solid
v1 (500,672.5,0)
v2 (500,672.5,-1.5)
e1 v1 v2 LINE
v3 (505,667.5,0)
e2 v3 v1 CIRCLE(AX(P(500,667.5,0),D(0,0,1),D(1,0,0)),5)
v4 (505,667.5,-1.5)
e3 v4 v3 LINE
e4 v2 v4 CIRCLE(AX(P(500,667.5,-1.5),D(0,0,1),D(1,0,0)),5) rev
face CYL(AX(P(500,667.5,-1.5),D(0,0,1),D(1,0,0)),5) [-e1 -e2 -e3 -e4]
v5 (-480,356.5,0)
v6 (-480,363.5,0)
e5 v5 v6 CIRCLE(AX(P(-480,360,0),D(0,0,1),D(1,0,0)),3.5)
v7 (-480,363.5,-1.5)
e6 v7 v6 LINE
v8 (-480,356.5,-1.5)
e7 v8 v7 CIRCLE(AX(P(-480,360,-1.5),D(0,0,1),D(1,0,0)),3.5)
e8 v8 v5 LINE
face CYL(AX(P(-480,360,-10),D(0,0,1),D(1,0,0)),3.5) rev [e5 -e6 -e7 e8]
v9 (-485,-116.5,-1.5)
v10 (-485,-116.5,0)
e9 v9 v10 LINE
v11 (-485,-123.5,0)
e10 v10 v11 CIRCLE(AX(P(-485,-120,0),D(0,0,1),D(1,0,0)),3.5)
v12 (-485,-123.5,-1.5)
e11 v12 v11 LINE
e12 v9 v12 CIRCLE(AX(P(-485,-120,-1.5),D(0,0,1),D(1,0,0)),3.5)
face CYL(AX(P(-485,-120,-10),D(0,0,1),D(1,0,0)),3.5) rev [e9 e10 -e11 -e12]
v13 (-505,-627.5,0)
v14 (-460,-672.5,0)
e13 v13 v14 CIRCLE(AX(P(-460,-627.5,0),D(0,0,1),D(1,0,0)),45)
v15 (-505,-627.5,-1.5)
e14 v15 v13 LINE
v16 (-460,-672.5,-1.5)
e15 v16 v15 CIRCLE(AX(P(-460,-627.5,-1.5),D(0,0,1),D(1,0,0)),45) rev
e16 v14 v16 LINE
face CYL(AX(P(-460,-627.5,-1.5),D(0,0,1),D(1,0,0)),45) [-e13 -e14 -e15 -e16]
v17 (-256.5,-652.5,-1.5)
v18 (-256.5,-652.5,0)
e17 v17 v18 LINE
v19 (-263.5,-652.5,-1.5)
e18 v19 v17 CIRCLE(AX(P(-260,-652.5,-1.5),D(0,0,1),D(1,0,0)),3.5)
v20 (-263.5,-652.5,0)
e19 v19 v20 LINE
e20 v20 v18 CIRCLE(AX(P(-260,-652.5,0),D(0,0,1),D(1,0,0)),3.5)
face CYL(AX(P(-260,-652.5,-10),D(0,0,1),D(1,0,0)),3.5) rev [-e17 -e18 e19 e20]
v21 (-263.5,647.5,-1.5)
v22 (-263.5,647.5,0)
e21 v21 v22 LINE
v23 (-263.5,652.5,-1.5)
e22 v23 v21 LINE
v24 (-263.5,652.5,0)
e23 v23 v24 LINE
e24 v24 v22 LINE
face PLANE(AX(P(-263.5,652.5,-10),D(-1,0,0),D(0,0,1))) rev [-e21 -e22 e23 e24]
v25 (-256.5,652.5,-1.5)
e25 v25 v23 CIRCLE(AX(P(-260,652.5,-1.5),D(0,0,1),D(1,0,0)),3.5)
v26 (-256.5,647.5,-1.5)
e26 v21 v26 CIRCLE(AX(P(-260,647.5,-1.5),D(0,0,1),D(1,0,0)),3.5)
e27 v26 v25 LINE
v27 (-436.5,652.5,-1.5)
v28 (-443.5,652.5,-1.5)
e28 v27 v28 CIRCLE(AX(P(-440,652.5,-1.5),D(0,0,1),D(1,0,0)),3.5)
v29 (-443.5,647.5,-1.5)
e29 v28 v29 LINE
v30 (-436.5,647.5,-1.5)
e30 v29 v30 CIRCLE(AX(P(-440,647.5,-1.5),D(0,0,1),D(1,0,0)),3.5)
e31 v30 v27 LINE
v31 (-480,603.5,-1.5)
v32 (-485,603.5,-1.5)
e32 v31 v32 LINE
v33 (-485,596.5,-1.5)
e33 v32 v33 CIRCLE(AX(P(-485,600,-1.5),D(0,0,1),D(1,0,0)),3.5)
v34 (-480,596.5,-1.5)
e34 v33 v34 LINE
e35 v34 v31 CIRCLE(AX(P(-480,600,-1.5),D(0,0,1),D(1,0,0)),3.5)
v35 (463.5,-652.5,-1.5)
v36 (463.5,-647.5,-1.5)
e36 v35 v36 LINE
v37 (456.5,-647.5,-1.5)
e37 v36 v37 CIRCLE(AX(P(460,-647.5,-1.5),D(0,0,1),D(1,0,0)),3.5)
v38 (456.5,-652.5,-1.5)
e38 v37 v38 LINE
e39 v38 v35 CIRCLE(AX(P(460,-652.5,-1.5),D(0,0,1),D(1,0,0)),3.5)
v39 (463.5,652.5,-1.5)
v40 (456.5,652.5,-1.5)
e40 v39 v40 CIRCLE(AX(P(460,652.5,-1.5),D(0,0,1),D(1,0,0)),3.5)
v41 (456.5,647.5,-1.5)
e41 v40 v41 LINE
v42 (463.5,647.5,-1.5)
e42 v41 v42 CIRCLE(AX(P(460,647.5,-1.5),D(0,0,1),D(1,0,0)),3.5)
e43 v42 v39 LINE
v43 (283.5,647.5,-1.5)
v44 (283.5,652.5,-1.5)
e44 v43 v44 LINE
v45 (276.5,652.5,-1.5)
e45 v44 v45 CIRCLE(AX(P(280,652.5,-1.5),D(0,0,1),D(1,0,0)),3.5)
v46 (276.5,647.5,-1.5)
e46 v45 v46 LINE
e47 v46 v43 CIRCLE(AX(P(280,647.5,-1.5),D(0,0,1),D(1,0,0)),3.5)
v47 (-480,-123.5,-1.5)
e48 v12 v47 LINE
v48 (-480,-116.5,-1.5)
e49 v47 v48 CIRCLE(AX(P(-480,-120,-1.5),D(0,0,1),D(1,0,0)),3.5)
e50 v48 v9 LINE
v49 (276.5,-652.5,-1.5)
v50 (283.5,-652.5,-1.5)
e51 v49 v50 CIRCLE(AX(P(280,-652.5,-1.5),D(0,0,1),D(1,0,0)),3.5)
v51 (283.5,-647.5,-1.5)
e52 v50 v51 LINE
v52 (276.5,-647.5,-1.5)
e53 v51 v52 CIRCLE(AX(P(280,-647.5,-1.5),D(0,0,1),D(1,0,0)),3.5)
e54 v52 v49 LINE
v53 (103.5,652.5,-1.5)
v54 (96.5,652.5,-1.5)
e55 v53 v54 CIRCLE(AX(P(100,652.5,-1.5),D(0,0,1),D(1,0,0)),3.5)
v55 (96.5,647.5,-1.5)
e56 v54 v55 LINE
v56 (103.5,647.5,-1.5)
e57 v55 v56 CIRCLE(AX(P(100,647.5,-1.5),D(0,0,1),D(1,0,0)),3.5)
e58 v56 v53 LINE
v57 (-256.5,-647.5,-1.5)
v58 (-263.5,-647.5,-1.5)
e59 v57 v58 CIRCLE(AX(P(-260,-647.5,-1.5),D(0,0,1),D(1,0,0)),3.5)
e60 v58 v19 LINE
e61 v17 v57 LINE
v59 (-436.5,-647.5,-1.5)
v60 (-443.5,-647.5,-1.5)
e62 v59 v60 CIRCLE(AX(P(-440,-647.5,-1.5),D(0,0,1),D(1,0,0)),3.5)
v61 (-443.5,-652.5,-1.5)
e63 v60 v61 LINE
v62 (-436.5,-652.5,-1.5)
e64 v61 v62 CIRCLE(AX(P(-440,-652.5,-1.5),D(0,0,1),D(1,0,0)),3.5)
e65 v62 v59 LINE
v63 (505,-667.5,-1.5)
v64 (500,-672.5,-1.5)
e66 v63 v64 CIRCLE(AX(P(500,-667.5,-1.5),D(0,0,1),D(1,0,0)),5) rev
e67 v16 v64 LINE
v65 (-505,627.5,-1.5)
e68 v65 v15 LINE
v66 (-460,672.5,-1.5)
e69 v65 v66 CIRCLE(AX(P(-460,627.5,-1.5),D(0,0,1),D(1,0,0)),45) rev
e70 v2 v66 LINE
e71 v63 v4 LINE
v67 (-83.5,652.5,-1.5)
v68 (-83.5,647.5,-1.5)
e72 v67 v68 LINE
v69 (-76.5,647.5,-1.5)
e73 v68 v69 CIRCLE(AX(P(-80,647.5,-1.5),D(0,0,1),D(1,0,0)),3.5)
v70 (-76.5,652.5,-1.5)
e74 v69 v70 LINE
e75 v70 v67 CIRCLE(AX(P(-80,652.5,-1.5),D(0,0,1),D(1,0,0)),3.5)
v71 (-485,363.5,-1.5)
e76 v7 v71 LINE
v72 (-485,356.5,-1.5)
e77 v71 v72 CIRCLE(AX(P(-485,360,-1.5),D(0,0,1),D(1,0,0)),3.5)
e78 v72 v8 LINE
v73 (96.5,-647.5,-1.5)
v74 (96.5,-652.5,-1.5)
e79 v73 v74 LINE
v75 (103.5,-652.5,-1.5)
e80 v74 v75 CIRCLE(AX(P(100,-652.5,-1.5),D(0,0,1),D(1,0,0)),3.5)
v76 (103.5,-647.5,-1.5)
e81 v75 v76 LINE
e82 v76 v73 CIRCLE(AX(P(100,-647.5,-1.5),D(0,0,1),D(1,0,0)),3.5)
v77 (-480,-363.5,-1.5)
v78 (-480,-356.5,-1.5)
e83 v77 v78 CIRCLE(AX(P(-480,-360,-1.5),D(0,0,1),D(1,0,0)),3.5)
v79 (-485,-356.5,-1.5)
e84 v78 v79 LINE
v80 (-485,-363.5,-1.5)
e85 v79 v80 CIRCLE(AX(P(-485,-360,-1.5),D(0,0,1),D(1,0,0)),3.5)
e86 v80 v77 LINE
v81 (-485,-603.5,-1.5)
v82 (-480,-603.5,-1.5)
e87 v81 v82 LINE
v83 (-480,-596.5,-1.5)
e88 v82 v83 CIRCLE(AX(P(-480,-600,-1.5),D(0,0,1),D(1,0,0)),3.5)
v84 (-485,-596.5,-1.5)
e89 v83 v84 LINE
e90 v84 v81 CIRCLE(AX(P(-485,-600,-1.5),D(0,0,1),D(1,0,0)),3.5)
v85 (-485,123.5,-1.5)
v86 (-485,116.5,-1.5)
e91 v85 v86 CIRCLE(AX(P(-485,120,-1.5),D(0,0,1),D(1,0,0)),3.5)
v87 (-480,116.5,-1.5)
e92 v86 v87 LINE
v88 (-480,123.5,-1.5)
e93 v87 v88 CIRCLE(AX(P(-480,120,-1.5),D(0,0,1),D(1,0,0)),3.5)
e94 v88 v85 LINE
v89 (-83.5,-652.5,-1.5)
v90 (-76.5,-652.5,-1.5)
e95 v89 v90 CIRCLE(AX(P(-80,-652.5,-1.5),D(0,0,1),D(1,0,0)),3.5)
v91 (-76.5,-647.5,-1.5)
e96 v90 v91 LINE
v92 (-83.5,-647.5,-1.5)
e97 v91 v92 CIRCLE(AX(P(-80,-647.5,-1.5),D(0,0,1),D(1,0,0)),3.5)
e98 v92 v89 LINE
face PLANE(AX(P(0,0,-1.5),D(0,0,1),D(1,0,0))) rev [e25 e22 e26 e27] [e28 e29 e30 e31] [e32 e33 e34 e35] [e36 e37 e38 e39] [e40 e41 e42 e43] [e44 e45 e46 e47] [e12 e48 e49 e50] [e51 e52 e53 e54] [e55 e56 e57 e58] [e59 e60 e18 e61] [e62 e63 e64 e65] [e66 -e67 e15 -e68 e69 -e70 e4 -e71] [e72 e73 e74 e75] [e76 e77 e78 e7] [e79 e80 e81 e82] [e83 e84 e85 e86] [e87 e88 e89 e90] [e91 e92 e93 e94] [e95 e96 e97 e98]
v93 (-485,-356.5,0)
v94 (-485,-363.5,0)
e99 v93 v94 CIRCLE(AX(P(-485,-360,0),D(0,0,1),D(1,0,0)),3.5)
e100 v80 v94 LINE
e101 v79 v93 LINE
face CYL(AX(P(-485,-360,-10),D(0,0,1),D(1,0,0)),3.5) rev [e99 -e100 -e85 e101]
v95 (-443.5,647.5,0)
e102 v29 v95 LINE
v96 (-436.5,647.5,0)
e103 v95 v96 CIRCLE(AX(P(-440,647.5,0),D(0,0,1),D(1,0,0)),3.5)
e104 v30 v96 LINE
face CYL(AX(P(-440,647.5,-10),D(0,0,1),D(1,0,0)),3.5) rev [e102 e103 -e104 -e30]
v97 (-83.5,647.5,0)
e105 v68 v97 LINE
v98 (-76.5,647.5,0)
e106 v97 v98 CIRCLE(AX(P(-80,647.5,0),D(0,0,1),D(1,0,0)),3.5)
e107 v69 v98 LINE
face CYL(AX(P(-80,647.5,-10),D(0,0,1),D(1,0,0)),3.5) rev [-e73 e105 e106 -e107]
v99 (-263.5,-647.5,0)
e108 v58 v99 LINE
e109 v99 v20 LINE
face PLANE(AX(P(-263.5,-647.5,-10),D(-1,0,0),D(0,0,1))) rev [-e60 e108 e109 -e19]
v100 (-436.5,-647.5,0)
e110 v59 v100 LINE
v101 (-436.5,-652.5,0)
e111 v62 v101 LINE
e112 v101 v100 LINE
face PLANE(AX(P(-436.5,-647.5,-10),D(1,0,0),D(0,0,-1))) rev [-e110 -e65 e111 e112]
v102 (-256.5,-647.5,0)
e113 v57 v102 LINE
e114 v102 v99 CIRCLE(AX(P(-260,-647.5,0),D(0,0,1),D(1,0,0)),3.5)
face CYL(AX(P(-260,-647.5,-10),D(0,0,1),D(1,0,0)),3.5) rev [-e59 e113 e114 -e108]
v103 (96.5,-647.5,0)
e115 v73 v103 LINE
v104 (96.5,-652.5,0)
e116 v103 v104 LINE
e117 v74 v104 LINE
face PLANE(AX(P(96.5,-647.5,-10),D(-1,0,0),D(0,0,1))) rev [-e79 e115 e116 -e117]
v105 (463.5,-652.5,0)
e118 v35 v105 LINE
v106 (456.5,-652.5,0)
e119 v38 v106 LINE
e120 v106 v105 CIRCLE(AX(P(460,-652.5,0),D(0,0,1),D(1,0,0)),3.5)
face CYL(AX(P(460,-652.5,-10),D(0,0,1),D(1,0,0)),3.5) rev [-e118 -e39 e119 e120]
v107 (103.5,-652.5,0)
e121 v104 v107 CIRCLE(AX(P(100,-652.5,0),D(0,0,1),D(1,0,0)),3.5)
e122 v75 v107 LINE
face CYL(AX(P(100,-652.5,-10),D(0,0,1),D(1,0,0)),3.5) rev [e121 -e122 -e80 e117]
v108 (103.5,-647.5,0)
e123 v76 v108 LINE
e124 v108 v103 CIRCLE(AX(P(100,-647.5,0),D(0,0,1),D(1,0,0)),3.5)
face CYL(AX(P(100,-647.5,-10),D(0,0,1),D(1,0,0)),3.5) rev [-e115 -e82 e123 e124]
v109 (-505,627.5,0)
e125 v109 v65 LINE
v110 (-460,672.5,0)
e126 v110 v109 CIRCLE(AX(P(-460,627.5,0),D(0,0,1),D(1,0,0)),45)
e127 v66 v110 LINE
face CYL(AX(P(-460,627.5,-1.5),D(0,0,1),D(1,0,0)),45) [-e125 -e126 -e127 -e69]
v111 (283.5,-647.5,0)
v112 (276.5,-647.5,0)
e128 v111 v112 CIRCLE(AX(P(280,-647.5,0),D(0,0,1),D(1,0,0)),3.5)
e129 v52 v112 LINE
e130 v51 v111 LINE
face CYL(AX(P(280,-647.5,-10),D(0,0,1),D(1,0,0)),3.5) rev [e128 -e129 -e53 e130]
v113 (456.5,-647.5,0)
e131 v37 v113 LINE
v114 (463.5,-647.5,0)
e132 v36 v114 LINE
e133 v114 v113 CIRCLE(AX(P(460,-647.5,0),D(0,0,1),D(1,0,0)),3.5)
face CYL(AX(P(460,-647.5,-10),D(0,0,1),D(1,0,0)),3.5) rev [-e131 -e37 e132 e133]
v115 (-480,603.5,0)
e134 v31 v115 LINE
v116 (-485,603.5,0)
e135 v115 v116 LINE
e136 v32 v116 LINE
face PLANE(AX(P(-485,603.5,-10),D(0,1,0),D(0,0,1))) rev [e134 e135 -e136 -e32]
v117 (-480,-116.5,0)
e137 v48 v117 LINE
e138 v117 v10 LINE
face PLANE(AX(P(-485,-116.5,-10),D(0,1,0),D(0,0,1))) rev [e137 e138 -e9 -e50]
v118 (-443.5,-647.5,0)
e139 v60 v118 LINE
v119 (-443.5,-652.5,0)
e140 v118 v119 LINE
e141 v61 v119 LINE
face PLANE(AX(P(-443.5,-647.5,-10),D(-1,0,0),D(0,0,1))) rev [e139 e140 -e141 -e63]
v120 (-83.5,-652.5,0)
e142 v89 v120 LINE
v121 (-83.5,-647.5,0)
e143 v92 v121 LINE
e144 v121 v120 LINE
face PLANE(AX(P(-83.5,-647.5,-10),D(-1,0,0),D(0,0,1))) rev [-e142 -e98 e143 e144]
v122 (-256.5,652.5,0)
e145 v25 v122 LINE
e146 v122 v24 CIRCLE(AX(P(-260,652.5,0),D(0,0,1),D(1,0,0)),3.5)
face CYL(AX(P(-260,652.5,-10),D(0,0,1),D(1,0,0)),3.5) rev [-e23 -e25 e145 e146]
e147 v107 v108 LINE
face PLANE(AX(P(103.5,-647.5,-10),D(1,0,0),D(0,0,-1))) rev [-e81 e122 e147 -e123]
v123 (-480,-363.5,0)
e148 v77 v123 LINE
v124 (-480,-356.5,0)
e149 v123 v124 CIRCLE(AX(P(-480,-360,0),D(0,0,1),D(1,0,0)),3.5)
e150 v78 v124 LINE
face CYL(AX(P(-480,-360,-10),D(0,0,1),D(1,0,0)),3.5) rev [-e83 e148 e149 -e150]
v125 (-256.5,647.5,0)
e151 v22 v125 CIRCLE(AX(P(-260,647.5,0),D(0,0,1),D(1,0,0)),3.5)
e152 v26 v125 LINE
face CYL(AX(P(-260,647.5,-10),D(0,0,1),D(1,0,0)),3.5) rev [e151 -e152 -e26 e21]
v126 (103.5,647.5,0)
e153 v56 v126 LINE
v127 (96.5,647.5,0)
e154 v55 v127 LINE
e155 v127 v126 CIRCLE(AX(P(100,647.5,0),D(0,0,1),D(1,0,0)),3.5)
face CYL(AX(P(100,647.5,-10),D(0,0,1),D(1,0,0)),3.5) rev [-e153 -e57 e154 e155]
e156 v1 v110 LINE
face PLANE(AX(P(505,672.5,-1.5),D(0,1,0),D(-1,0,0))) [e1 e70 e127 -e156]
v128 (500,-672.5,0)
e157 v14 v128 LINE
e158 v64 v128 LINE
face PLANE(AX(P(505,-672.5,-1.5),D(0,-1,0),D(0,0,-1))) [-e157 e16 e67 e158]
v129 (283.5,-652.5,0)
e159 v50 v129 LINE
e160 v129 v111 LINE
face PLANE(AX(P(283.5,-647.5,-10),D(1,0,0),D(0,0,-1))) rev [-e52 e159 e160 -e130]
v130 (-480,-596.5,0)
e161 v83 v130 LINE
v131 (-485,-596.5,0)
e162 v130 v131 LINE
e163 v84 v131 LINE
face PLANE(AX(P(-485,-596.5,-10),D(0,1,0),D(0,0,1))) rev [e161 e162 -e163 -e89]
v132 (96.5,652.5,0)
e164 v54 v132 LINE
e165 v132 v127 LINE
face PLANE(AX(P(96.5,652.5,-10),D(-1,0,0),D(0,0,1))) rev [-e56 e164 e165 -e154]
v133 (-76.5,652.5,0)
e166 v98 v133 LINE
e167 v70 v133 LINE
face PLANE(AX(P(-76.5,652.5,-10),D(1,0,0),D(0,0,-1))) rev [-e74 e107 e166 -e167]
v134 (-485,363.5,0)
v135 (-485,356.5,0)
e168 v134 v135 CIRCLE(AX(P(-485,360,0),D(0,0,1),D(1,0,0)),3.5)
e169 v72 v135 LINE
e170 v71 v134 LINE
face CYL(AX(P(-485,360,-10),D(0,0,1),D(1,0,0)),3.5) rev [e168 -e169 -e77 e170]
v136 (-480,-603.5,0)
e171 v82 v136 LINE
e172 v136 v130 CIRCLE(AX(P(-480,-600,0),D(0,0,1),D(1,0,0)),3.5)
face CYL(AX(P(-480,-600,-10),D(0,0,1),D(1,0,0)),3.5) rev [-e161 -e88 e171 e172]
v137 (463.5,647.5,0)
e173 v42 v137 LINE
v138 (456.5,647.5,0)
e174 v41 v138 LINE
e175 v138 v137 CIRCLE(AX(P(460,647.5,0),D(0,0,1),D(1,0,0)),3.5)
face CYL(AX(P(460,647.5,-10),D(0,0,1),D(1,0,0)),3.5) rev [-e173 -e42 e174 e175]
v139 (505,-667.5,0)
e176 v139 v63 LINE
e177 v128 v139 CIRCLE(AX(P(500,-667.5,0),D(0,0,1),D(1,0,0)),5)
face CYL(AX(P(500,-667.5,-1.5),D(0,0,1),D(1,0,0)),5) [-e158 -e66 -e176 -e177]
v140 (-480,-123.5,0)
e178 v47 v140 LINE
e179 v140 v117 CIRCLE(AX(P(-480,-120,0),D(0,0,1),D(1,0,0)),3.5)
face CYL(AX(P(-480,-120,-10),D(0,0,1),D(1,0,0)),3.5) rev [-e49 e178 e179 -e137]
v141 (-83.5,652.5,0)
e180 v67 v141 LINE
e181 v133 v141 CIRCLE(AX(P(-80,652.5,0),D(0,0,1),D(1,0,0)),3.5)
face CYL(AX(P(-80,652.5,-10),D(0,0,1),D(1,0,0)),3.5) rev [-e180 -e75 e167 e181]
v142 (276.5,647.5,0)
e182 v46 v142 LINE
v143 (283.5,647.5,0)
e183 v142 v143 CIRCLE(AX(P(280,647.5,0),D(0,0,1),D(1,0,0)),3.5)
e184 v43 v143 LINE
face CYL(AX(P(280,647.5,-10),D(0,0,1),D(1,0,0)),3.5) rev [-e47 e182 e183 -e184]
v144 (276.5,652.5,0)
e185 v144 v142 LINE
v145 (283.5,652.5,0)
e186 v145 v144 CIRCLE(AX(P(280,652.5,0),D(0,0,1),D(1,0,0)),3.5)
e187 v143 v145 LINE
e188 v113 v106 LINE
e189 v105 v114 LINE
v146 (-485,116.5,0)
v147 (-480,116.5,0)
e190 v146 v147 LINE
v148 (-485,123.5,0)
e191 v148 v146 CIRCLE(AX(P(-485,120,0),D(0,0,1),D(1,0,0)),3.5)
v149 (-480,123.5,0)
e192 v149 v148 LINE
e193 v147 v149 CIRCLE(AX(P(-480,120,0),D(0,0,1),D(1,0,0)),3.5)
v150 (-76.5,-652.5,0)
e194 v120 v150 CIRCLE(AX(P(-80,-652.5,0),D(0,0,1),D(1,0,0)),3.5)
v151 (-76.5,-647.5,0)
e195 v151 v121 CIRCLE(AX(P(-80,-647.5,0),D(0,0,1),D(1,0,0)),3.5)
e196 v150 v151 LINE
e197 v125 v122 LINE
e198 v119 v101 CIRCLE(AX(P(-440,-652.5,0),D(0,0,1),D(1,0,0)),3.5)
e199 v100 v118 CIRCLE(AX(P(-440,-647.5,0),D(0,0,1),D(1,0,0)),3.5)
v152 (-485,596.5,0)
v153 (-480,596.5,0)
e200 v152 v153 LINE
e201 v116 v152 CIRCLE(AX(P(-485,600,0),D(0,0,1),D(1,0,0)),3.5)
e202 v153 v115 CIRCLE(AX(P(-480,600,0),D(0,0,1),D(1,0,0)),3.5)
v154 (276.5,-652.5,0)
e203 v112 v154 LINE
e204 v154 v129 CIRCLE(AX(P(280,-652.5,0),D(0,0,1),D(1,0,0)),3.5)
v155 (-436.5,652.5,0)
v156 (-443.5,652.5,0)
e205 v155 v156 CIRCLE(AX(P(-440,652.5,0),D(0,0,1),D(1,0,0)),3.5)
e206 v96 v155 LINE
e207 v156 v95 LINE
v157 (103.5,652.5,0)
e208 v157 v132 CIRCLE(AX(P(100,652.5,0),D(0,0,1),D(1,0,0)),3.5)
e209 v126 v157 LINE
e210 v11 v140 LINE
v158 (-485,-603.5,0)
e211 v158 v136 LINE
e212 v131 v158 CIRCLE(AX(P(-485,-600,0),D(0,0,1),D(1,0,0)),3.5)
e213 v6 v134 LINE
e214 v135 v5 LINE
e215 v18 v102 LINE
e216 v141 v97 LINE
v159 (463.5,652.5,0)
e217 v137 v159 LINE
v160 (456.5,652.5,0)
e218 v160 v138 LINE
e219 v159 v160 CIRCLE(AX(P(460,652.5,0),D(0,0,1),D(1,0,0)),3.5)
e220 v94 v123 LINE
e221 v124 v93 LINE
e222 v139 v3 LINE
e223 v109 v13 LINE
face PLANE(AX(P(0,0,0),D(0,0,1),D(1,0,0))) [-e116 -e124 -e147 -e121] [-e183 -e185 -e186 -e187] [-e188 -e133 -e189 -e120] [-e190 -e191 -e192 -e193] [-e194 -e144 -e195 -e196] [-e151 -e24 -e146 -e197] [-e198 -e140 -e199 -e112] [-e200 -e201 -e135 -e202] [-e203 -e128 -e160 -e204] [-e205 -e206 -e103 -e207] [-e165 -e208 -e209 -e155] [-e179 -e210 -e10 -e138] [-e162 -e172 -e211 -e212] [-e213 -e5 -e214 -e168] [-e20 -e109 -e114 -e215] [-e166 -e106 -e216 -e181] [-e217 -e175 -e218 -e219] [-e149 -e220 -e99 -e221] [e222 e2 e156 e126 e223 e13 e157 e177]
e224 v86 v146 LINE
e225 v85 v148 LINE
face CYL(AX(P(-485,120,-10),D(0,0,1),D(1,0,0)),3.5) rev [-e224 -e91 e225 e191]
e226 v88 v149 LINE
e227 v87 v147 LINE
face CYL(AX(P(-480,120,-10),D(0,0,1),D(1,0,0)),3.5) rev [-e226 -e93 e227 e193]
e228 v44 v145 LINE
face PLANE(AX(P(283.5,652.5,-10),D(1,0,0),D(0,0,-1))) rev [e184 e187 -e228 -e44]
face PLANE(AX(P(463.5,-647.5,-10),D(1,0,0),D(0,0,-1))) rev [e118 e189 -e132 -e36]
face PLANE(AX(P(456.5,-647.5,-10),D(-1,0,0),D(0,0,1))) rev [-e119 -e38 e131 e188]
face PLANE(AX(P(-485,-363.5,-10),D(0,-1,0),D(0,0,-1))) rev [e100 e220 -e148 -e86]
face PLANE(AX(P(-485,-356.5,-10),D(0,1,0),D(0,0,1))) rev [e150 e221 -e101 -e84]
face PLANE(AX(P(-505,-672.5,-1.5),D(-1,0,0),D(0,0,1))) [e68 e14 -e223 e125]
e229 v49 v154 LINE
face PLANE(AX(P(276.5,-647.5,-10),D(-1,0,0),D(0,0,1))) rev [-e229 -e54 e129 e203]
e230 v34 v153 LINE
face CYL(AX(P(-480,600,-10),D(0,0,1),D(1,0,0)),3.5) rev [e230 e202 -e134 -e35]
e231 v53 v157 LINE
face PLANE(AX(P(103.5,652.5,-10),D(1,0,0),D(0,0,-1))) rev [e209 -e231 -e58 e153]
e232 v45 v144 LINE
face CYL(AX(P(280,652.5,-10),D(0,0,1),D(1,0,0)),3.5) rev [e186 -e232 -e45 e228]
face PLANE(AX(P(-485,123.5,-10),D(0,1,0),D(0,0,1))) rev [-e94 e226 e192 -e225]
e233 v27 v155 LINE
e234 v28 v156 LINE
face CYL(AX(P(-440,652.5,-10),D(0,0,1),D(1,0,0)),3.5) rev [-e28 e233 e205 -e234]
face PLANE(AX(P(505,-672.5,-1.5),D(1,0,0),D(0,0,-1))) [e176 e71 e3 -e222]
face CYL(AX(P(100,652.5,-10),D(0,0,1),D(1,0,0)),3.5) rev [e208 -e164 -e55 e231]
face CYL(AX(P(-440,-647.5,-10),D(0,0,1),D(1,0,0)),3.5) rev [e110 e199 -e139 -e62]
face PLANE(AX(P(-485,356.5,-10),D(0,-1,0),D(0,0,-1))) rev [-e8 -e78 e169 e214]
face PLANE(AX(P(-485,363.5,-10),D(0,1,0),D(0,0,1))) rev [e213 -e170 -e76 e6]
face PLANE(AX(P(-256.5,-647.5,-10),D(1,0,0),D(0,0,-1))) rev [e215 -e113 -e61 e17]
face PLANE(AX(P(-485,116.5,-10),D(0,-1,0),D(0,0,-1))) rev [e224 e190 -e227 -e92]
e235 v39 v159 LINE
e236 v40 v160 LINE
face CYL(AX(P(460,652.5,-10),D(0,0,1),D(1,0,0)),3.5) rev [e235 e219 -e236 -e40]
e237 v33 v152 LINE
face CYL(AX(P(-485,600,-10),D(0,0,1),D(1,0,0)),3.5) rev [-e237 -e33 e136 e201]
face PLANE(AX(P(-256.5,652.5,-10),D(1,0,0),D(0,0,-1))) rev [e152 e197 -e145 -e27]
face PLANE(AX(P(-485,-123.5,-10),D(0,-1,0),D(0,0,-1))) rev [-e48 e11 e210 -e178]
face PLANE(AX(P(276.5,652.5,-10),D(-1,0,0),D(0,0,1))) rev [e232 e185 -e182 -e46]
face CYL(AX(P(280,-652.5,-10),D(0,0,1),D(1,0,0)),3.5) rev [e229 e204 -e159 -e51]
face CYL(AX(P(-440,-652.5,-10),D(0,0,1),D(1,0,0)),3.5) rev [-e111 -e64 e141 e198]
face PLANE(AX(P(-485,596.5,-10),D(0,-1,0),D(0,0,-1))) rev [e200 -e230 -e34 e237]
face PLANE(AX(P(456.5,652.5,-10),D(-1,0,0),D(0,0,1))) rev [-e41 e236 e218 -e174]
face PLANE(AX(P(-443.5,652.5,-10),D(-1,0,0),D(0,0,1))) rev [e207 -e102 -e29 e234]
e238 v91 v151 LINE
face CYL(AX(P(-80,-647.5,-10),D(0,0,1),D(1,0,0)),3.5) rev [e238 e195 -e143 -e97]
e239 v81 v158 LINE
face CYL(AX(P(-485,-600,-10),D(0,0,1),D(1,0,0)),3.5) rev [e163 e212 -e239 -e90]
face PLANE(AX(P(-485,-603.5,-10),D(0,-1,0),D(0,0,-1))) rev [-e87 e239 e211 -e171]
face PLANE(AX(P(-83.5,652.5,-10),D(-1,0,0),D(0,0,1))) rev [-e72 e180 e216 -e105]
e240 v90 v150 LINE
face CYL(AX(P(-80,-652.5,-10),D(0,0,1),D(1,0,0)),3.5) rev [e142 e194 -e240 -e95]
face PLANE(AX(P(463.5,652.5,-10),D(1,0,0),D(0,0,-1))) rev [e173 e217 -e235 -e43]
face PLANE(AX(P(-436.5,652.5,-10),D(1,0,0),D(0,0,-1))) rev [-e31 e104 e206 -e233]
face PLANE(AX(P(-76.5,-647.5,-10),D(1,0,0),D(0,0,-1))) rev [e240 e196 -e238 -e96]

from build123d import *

# Parameters (mm, degrees)
SKETCH_1_W             = 1010
SKETCH_1_H             = 1345
SM_BASE_FLANGE_1_DEPTH = 1.5
FILLET_1_R             = 45
FILLET_2_R             = 5
CUT_EXTRUDE_1_DEPTH    = 10
PATTERN_LINEAR_1_COUNT = 6
PATTERN_LINEAR_1_PITCH = 240
CUT_EXTRUDE_2_DEPTH    = 10
PATTERN_LINEAR_2_COUNT = 6
PATTERN_LINEAR_2_PITCH = 180


# Sheet-metal steps are written as plain solids
with BuildPart() as part:
    # Sketch 1 → 基体-法兰1 (new body)
    with BuildSketch(Plane.XY):
        Rectangle(SKETCH_1_W, SKETCH_1_H)
    extrude(amount=-SM_BASE_FLANGE_1_DEPTH)

    # 圆角1
    fillet_1_edges = [part.edges().sort_by_distance(p)[0] for p in [
        (-505, 672.5, -0.75),
        (-505, -672.5, -0.75),
    ]]
    fillet(fillet_1_edges, radius=FILLET_1_R)

    # 圆角2
    fillet_2_edges = [part.edges().sort_by_distance(p)[0] for p in [
        (505, 672.5, -0.75),
        (505, -672.5, -0.75),
    ]]
    fillet(fillet_2_edges, radius=FILLET_2_R)

    # Sketch 2 → 切除-拉伸1 (cut)
    with BuildSketch(Plane.XY):
        with BuildLine():
            Line((-485, -596.5), (-480, -596.5))
            ThreePointArc((-480, -596.5), (-476.5, -600), (-480, -603.5))
            Line((-480, -603.5), (-485, -603.5))
            ThreePointArc((-485, -603.5), (-488.5, -600), (-485, -596.5))
        make_face()
    cut_extrude_1 = extrude(amount=-CUT_EXTRUDE_1_DEPTH, mode=Mode.SUBTRACT)

    # 阵列(线性)1: 切除-拉伸1 ×6
    with Locations(*[(0, i * PATTERN_LINEAR_1_PITCH, 0) for i in range(1, PATTERN_LINEAR_1_COUNT)]):
        add(cut_extrude_1, mode=Mode.SUBTRACT)

    # 草图3 → 切除-拉伸2 (cut)
    with BuildSketch(Plane.XY):
        with BuildLine():
            Line((-436.5, 652.5), (-436.5, 647.5))
            ThreePointArc((-436.5, 647.5), (-440, 644), (-443.5, 647.5))
            Line((-443.5, 647.5), (-443.5, 652.5))
            ThreePointArc((-443.5, 652.5), (-440, 656), (-436.5, 652.5))
        make_face()
        with BuildLine():
            Line((-436.5, -647.5), (-436.5, -652.5))
            ThreePointArc((-436.5, -652.5), (-440, -656), (-443.5, -652.5))
            Line((-443.5, -652.5), (-443.5, -647.5))
            ThreePointArc((-443.5, -647.5), (-440, -644), (-436.5, -647.5))
        make_face()
    cut_extrude_2 = extrude(amount=-CUT_EXTRUDE_2_DEPTH, mode=Mode.SUBTRACT)

    # 阵列(线性)2: 切除-拉伸2 ×6
    with Locations(*[(i * PATTERN_LINEAR_2_PITCH, 0, 0) for i in range(1, PATTERN_LINEAR_2_COUNT)]):
        add(cut_extrude_2, mode=Mode.SUBTRACT)


solid = part.part
